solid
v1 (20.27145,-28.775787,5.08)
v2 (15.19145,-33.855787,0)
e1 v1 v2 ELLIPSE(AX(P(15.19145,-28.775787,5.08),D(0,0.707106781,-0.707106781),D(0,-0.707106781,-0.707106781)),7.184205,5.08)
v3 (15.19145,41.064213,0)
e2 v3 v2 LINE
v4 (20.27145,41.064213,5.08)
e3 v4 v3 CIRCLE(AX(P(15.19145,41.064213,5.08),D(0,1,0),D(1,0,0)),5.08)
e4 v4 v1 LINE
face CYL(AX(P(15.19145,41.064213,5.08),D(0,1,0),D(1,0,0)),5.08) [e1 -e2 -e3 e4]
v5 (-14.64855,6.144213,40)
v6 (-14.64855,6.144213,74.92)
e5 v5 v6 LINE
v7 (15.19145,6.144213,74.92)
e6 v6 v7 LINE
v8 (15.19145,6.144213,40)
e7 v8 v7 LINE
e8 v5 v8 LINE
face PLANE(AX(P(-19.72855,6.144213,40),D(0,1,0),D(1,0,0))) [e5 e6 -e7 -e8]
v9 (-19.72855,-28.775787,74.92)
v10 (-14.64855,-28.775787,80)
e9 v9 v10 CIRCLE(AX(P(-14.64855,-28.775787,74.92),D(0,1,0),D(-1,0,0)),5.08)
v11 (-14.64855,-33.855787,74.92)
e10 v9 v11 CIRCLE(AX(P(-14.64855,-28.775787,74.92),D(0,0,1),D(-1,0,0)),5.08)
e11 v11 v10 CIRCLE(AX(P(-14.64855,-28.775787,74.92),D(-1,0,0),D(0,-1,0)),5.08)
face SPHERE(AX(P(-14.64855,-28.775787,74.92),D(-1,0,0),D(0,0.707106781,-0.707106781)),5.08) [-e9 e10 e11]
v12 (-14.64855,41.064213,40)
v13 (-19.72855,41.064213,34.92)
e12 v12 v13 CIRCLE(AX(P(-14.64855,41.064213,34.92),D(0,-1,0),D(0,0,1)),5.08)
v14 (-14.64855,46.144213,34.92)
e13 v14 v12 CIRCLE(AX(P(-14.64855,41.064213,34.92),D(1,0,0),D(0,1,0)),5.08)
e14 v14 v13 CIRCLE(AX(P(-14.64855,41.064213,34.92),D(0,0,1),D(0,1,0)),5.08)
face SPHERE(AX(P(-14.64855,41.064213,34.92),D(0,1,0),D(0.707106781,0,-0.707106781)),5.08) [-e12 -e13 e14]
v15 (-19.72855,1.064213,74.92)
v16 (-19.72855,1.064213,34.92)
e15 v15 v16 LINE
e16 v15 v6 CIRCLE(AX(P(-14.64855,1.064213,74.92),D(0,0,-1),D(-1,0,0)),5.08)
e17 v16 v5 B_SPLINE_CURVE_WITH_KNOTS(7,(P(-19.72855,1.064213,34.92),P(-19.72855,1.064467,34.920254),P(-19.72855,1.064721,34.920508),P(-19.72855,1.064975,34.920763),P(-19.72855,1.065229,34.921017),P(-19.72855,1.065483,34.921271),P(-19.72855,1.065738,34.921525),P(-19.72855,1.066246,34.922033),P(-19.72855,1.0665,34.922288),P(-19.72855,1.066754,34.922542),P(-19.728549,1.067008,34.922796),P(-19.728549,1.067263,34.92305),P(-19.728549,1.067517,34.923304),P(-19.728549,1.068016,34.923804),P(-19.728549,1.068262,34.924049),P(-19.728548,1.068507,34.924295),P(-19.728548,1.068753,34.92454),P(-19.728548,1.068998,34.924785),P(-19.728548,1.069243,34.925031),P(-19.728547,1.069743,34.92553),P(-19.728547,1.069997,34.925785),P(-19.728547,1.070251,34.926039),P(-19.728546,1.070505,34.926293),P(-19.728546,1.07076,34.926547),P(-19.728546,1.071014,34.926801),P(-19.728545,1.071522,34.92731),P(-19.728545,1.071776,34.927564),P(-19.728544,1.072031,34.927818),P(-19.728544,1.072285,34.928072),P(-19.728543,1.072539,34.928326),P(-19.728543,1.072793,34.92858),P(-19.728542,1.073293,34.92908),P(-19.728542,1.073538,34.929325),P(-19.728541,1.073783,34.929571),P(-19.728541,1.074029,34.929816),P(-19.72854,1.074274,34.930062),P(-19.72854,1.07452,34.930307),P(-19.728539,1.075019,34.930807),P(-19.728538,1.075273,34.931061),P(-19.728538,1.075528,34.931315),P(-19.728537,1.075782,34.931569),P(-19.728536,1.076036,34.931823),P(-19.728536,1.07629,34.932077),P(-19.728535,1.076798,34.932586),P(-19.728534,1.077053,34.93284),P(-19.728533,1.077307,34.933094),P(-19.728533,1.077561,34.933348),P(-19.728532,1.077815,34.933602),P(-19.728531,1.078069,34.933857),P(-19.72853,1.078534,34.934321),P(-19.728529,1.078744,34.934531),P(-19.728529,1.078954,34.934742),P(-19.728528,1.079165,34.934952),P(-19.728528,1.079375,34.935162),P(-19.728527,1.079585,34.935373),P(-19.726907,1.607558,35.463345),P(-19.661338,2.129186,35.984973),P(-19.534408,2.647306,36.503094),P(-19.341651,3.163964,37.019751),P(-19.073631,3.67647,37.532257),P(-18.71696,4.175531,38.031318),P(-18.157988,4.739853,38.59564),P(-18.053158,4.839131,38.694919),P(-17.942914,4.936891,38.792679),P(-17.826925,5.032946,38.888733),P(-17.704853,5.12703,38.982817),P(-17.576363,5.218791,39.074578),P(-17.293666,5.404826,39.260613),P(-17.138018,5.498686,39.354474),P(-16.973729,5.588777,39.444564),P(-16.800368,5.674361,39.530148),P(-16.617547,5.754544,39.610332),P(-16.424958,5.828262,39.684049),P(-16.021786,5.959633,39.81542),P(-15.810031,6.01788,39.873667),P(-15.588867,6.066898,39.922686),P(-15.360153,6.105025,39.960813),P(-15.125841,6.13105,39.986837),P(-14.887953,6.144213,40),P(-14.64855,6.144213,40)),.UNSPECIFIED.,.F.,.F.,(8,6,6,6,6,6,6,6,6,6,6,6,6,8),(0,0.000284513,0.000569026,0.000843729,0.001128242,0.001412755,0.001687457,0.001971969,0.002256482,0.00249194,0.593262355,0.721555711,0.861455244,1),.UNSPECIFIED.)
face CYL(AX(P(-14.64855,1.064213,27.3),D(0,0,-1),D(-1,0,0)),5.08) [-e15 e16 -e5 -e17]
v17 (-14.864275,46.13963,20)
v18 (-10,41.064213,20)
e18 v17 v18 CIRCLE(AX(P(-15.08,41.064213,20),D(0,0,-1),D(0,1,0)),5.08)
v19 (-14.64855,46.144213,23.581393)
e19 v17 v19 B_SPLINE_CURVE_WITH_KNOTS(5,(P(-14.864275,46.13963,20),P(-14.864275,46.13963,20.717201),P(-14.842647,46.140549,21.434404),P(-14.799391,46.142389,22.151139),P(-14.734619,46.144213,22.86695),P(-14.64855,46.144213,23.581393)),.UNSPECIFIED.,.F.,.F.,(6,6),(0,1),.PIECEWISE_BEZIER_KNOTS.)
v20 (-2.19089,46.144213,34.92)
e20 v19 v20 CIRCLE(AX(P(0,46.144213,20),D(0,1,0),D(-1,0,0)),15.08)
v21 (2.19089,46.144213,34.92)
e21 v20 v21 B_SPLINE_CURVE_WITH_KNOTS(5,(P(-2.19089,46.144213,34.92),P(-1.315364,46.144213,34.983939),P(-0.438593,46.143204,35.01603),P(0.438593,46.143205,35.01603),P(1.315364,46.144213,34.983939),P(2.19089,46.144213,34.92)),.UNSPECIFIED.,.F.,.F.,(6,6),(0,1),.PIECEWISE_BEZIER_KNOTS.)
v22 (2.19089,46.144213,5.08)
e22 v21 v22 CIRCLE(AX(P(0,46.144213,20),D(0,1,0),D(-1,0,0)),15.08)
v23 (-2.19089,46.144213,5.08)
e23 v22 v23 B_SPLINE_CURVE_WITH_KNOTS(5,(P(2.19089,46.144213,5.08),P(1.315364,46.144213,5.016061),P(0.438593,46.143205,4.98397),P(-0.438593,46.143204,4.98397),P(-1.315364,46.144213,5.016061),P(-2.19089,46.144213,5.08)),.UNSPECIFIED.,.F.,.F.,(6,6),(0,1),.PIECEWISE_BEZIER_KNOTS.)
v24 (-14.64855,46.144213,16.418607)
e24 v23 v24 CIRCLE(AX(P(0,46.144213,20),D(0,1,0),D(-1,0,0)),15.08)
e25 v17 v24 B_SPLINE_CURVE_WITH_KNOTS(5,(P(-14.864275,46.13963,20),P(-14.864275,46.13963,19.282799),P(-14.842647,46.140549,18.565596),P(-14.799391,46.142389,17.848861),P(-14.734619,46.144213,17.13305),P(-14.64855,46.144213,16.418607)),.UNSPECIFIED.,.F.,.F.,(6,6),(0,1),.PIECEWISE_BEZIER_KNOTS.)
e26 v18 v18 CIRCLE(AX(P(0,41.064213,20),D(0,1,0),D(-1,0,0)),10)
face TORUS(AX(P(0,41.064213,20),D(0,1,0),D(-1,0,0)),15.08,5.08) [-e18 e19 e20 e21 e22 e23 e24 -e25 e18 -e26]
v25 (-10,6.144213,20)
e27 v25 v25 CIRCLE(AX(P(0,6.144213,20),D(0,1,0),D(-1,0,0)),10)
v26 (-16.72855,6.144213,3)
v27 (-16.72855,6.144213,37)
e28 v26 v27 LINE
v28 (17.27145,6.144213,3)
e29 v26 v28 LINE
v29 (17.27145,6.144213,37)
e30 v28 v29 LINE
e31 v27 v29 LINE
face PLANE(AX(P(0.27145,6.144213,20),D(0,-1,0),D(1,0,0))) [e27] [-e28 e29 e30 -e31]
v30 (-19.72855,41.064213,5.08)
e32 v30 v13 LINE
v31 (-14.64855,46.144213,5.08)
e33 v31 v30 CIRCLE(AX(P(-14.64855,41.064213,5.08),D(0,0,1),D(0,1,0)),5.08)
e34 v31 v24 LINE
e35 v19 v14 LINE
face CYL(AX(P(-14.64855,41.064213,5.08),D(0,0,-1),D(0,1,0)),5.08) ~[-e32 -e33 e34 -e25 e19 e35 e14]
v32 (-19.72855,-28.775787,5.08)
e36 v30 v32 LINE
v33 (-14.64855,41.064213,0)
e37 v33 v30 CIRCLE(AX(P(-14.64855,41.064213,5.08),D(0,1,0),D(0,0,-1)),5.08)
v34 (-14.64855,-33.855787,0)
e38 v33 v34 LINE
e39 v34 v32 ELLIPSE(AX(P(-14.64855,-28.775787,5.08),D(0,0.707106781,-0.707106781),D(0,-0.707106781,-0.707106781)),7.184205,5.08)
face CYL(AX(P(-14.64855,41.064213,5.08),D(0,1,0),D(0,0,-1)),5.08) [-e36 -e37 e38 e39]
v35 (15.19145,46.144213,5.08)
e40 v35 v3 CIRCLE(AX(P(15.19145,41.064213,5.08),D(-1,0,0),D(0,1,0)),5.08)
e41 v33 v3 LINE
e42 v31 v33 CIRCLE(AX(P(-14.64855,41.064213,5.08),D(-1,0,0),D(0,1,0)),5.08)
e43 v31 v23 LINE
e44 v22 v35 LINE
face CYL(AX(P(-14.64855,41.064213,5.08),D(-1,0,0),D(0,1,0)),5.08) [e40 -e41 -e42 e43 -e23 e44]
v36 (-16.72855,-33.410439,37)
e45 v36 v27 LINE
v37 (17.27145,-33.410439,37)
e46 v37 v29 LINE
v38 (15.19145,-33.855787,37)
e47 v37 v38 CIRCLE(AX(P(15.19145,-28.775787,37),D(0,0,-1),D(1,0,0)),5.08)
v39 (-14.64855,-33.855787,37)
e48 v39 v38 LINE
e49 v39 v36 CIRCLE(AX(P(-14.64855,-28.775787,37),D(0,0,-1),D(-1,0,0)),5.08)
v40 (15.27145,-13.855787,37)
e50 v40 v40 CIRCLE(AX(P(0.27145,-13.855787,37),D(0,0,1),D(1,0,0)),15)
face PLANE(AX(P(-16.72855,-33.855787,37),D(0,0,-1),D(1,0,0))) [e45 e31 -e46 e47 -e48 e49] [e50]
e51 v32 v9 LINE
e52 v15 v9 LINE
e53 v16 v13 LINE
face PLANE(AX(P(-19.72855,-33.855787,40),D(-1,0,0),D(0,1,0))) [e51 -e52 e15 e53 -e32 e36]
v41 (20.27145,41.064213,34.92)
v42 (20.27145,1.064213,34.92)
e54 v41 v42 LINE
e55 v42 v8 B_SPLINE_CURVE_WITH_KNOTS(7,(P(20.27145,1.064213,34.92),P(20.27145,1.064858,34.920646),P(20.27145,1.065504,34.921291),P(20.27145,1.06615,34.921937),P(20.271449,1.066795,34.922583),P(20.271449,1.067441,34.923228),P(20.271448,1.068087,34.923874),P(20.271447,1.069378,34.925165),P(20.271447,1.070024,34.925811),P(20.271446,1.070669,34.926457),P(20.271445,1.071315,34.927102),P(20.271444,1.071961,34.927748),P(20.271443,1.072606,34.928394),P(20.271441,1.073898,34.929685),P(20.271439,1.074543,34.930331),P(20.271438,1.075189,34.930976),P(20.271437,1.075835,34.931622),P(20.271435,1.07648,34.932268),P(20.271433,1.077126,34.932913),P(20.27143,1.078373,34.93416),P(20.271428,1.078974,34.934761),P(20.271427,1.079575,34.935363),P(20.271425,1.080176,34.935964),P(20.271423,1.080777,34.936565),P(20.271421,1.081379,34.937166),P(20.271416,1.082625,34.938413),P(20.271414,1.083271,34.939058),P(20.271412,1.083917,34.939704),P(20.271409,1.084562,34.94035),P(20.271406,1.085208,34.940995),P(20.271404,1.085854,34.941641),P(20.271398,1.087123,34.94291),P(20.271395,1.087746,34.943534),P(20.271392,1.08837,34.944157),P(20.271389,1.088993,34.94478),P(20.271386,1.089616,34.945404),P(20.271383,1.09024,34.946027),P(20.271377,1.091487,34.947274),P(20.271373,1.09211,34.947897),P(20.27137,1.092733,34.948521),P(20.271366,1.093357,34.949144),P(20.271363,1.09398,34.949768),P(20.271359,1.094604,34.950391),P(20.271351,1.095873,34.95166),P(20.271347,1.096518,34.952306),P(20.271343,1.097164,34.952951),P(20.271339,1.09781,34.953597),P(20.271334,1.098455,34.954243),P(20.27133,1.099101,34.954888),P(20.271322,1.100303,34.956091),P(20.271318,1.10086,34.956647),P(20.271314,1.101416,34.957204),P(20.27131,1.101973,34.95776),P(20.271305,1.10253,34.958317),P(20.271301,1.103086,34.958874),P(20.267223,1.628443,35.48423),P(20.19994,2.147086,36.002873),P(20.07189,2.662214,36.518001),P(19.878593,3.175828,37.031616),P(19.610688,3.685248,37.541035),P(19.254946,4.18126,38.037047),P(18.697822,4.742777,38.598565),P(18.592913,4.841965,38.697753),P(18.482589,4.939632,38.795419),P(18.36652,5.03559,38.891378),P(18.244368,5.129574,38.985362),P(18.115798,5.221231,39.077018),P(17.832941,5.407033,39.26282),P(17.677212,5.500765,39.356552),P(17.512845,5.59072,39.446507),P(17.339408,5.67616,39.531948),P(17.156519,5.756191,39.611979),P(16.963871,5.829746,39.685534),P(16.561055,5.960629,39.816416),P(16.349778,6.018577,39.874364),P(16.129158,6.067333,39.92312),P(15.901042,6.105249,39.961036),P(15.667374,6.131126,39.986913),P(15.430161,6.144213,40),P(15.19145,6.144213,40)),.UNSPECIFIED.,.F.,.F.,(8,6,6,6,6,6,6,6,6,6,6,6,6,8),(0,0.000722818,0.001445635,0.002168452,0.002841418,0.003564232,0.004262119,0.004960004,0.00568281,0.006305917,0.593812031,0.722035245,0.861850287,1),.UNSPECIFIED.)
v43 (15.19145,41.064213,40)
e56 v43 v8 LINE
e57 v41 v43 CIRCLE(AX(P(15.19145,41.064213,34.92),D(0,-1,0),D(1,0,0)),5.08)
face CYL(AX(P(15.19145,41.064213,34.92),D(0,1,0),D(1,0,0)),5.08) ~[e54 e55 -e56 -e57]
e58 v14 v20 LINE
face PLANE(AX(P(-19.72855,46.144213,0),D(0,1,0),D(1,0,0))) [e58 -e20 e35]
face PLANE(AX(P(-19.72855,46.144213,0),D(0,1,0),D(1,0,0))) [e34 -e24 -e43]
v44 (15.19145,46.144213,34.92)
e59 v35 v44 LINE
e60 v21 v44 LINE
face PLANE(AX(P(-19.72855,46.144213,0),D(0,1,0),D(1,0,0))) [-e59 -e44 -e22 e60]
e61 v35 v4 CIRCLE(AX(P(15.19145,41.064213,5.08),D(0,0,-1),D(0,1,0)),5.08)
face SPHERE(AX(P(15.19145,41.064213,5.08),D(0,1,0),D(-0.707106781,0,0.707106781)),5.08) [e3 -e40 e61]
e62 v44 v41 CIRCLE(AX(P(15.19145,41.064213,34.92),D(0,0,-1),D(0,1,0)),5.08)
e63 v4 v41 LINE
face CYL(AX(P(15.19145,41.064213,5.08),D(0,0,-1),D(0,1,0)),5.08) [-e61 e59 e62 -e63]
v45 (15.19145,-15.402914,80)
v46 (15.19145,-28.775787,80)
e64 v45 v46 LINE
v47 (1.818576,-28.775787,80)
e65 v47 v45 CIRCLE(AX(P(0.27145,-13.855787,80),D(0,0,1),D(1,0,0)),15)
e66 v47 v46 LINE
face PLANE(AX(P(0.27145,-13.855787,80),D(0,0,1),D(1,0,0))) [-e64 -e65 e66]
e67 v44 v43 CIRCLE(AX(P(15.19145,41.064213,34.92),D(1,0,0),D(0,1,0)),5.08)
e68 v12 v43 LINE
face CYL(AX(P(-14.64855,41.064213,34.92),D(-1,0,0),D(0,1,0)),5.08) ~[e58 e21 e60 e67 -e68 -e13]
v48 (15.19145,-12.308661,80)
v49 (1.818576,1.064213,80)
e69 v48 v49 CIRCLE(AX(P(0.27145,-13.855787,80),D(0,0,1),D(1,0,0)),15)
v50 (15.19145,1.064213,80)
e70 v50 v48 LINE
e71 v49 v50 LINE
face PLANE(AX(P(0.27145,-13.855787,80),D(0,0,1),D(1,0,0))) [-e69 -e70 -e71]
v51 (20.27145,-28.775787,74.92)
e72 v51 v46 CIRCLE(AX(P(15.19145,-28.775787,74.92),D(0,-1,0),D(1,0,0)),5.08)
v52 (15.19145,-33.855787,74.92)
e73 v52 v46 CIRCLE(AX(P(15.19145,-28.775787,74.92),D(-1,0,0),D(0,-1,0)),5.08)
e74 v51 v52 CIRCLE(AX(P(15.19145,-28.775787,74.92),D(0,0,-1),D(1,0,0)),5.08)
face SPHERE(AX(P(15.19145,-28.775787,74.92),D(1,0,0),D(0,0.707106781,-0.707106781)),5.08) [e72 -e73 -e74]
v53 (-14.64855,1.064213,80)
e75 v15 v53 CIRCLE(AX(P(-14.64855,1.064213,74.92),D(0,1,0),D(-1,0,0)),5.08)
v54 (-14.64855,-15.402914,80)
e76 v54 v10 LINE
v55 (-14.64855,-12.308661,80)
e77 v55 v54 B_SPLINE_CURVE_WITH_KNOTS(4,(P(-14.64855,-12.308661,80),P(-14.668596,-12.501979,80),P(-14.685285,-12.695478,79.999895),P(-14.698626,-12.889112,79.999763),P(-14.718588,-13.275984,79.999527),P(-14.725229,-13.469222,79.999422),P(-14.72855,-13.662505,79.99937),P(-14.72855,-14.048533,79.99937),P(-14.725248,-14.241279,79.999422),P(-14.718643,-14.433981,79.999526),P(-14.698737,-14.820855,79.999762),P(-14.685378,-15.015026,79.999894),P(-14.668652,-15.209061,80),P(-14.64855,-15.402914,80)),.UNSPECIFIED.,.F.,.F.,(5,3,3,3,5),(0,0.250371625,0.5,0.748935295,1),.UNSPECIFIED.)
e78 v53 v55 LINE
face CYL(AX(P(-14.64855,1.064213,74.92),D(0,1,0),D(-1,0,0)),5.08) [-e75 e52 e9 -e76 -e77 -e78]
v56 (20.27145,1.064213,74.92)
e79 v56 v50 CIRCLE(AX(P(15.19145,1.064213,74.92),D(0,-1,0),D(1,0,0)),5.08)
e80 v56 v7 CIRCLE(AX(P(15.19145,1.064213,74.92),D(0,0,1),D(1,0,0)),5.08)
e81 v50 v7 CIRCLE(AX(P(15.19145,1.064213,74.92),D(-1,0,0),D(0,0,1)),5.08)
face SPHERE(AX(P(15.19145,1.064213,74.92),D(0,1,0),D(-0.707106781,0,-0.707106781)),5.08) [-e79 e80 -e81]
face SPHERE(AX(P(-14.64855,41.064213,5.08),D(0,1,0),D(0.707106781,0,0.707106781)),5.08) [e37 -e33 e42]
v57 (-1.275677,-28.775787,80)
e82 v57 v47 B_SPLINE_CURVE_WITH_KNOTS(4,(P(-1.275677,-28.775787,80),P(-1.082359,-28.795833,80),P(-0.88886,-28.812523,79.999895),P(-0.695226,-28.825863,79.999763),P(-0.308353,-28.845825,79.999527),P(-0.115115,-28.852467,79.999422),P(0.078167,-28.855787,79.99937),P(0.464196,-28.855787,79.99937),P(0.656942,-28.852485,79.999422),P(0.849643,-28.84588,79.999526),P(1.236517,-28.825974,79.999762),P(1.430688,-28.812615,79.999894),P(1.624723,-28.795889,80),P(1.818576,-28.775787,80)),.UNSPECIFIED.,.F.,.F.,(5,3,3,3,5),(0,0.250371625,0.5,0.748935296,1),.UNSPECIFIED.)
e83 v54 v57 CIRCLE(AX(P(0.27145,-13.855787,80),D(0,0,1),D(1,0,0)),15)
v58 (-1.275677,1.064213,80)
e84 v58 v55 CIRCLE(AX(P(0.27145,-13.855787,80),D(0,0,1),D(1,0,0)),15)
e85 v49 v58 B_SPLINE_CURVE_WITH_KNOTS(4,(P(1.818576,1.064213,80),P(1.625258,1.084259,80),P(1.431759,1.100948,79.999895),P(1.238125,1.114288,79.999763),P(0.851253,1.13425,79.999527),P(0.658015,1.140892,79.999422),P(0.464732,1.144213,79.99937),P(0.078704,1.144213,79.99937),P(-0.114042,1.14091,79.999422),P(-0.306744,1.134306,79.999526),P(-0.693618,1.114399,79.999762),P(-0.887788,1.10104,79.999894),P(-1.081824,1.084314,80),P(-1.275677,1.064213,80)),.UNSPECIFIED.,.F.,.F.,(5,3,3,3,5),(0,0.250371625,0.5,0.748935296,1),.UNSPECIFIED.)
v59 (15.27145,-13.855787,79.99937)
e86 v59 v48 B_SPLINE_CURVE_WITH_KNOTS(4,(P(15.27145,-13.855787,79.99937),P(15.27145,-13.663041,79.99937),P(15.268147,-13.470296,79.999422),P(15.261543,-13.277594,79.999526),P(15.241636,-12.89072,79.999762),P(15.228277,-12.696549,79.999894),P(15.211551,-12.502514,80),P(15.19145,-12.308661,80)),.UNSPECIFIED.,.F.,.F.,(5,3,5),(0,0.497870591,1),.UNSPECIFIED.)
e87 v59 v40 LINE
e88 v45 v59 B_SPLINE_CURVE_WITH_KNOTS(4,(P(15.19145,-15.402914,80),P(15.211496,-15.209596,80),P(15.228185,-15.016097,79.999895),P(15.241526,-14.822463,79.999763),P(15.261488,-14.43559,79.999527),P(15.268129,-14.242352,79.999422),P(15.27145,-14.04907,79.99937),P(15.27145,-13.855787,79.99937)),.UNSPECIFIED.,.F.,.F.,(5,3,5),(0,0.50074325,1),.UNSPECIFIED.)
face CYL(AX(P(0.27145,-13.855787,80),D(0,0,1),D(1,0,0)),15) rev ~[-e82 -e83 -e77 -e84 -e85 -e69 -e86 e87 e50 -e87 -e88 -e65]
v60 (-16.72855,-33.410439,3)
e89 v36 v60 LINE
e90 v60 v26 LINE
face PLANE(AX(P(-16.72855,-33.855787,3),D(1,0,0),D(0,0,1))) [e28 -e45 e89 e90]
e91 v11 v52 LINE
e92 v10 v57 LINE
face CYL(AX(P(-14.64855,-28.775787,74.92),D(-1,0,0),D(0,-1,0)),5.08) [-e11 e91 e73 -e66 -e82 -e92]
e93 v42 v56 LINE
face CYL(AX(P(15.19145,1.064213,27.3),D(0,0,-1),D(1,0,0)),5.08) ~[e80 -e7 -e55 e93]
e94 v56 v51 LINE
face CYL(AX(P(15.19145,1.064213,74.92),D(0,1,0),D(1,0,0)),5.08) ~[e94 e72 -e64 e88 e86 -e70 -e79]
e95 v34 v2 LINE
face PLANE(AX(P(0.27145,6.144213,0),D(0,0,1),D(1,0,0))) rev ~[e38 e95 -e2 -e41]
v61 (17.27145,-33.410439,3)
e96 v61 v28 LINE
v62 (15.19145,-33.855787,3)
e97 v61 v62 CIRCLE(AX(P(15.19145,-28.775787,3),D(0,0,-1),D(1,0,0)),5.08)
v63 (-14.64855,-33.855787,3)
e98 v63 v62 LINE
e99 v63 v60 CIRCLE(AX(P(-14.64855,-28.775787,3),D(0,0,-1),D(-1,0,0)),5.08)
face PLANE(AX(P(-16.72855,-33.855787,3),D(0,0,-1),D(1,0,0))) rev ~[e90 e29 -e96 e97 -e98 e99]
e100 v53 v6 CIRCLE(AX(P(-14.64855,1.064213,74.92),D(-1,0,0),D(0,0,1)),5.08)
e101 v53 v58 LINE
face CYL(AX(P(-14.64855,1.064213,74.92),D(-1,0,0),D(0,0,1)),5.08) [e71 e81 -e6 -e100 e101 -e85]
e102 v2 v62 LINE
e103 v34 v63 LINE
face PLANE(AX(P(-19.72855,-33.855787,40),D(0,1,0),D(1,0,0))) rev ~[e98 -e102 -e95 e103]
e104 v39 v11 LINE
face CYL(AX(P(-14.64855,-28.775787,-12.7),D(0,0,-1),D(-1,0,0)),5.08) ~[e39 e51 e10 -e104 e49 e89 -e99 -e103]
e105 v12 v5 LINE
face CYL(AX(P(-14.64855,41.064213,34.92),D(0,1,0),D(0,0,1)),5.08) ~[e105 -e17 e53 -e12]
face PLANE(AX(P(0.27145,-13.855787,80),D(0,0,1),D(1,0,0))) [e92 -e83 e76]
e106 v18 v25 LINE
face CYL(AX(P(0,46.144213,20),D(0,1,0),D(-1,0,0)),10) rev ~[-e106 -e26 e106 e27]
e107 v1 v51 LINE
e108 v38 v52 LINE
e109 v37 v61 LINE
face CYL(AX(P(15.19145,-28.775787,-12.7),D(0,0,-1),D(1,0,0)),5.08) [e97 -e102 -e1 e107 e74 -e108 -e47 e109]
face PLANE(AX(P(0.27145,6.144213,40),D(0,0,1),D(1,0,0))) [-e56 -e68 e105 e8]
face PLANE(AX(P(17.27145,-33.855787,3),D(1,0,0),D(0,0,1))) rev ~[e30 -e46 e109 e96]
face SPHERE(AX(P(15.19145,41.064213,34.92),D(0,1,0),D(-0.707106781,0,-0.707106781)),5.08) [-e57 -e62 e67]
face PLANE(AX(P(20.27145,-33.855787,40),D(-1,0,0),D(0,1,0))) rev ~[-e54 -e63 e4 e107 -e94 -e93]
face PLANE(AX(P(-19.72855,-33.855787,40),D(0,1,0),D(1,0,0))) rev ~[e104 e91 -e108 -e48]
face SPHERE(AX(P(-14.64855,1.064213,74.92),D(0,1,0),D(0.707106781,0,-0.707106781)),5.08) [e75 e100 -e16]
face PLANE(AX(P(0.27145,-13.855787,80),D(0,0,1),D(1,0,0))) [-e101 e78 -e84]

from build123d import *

# Parameters (mm, degrees)
F0_W          = 40
F0_H          = 80
F1_DEPTH      = 40
F2_W          = 40
F2_H          = 40
F3_DEPTH      = 40
F4_W          = 34
F4_H          = 34
F5_DEPTH      = 40
F6_R          = 15
F7_DEPTH      = 43
F8_R          = 10
F9_DEPTH      = 80.001
F10_T1_DEPTH  = 87.62
F10_T3_DEPTH  = 29.84
F10_T5_DEPTH  = 34.92
F10_T7_DEPTH  = 34.92
F10_T9_DEPTH  = 29.84
F10_T11_DEPTH = 87.62
F10_T13_DEPTH = 29.84
F10_S17_W     = 5.08
F10_S17_H     = 5.08
F10_T18_DEPTH = 5.08
F10_S23_W     = 5.08
F10_S23_H     = 5.08
F10_T24_DEPTH = 5.08
F10_S29_W     = 5.08
F10_S29_H     = 5.08
F10_T30_DEPTH = 5.08
F10_S35_W     = 5.08
F10_S35_H     = 5.08
F10_T36_DEPTH = 5.08
F10_S41_W     = 5.08
F10_S41_H     = 5.08
F10_T42_DEPTH = 5.08
F10_S47_W     = 5.08
F10_S47_H     = 5.08
F10_T48_DEPTH = 5.08
F10_S53_W     = 5.08
F10_S53_H     = 5.08
F10_T54_DEPTH = 5.08
F10_S59_W     = 5.08
F10_S59_H     = 5.08
F10_T60_DEPTH = 5.08
F10_T69_DEPTH = 47.62
F10_T73_DEPTH = 47.62
F10_T80_DEPTH = 47.62
F10_T84_DEPTH = 47.62


# Not quite as in the source:
# - a fillet or chamfer that OpenCascade refuses, or shapes differently, is made with other operations: its cross-section is extruded or revolved along the edge and cut away or added


with BuildPart() as f1:
    # F0 (on Top) → F1 (new body)
    with BuildSketch(Plane.XY):
        with Locations((0.2714497969, 6.1442126253)):
            Rectangle(F0_W, F0_H)
    extrude(amount=F1_DEPTH)

    # F2 (on face) → F3 (join)
    with BuildSketch(Plane.XY.offset(40)):
        with Locations((0.2714497969, -13.8557873747)):
            Rectangle(F2_W, F2_H)
    extrude(amount=F3_DEPTH)

    # F4 (on face) → F5 (cut)
    with BuildSketch(Plane.XZ.offset(33.8557873747)):
        with Locations((0.2714497969, 20)):
            Rectangle(F4_W, F4_H)
    extrude(amount=-F5_DEPTH, mode=Mode.SUBTRACT)

    # F6 (on face) → F7 (cut, through all)
    with BuildSketch(Plane.XY.offset(80)):
        with Locations((0.2714497969, -13.8557873747)):
            Circle(F6_R)
    extrude(amount=-F7_DEPTH, mode=Mode.SUBTRACT)

    # F8 (on face) → F9 (cut, through all)
    with BuildSketch(Plane(origin=(0, 46.1442126253, 0), x_dir=(-1, 0, 0), z_dir=(0, 1, 0))):
        with Locations((0, 20)):
            Circle(F8_R)
    extrude(amount=-F9_DEPTH, mode=Mode.SUBTRACT)

    # F10: fillet of radius 5.08 on 17 edges, made by hand

    # F10_s2 → F10_t1 (cut)
    with BuildSketch(Plane.XY.offset(-12.7)):
        with BuildLine():
            ThreePointArc((20.2714497969, -28.7757873747), (18.7835522453, -32.3678898231), (15.1914497969, -33.8557873747))
            Line((15.1914497969, -33.8557873747), (20.2714497969, -33.8557873747))
            Line((20.2714497969, -33.8557873747), (20.2714497969, -28.7757873747))
        make_face()
        with BuildLine():
            ThreePointArc((-19.7285502031, -28.7757873747), (-18.2406526516, -32.3678898231), (-14.6485502031, -33.8557873747))
            Line((-14.6485502031, -33.8557873747), (-19.7285502031, -33.8557873747))
            Line((-19.7285502031, -33.8557873747), (-19.7285502031, -28.7757873747))
        make_face()
    extrude(amount=F10_T1_DEPTH, mode=Mode.SUBTRACT)

    # F10_s4 → F10_t3 (cut)
    with BuildSketch(Plane.XZ.offset(-1.0642126253)):
        with BuildLine():
            ThreePointArc((20.2714497969, 74.92), (18.7835522453, 78.5121024484), (15.1914497969, 80))
            Line((15.1914497969, 80), (20.2714497969, 80))
            Line((20.2714497969, 80), (20.2714497969, 74.92))
        make_face()
        with BuildLine():
            ThreePointArc((-19.7285502031, 74.92), (-18.2406526516, 78.5121024484), (-14.6485502031, 80))
            Line((-14.6485502031, 80), (-19.7285502031, 80))
            Line((-19.7285502031, 80), (-19.7285502031, 74.92))
        make_face()
    extrude(amount=F10_T3_DEPTH, mode=Mode.SUBTRACT)

    # F10_s6 → F10_t5 (cut)
    with BuildSketch(Plane.XY.offset(40)):
        with BuildLine():
            ThreePointArc((20.2714497969, 1.0642126253), (18.7835522453, 4.6563150738), (15.1914497969, 6.1442126253))
            Line((15.1914497969, 6.1442126253), (20.2714497969, 6.1442126253))
            Line((20.2714497969, 6.1442126253), (20.2714497969, 1.0642126253))
        make_face()
        with BuildLine():
            ThreePointArc((-19.7285502031, 1.0642126253), (-18.2406526516, 4.6563150738), (-14.6485502031, 6.1442126253))
            Line((-14.6485502031, 6.1442126253), (-19.7285502031, 6.1442126253))
            Line((-19.7285502031, 6.1442126253), (-19.7285502031, 1.0642126253))
        make_face()
    extrude(amount=F10_T5_DEPTH, mode=Mode.SUBTRACT)

    # F10_s8 → F10_t7 (cut)
    with BuildSketch(Plane.XZ.offset(-41.0642126253)):
        with BuildLine():
            ThreePointArc((20.2714497969, 34.92), (18.7835522453, 38.5121024484), (15.1914497969, 40))
            Line((15.1914497969, 40), (20.2714497969, 40))
            Line((20.2714497969, 40), (20.2714497969, 34.92))
        make_face()
        with BuildLine():
            ThreePointArc((-14.6485502031, 40), (-18.2406526516, 38.5121024484), (-19.7285502031, 34.92))
            Line((-19.7285502031, 34.92), (-19.7285502031, 40))
            Line((-19.7285502031, 40), (-14.6485502031, 40))
        make_face()
    extrude(amount=F10_T7_DEPTH, mode=Mode.SUBTRACT)

    # F10_s10 → F10_t9 (cut)
    with BuildSketch(Plane.XY.offset(5.08)):
        with BuildLine():
            ThreePointArc((15.1914497969, 46.1442126253), (18.7835522453, 44.6563150738), (20.2714497969, 41.0642126253))
            Line((20.2714497969, 41.0642126253), (20.2714497969, 46.1442126253))
            Line((20.2714497969, 46.1442126253), (15.1914497969, 46.1442126253))
        make_face()
        with BuildLine():
            ThreePointArc((-14.6485502031, 46.1442126253), (-18.2406526516, 44.6563150738), (-19.7285502031, 41.0642126253))
            Line((-19.7285502031, 41.0642126253), (-19.7285502031, 46.1442126253))
            Line((-19.7285502031, 46.1442126253), (-14.6485502031, 46.1442126253))
        make_face()
    extrude(amount=F10_T9_DEPTH, mode=Mode.SUBTRACT)

    # F10_s12 → F10_t11 (cut)
    with BuildSketch(Plane.XZ.offset(-41.0642126253)):
        with BuildLine():
            ThreePointArc((20.2714497969, 5.08), (18.7835522453, 1.4878975516), (15.1914497969, 0))
            Line((15.1914497969, 0), (20.2714497969, 0))
            Line((20.2714497969, 0), (20.2714497969, 5.08))
        make_face()
        with BuildLine():
            ThreePointArc((-14.6485502031, 0), (-18.2406526516, 1.4878975516), (-19.7285502031, 5.08))
            Line((-19.7285502031, 5.08), (-19.7285502031, 0))
            Line((-19.7285502031, 0), (-14.6485502031, 0))
        make_face()
    extrude(amount=F10_T11_DEPTH, mode=Mode.SUBTRACT)

    # F10_s14 → F10_t13 (cut)
    with BuildSketch(Plane.YZ.offset(-14.6485502031)):
        with BuildLine():
            ThreePointArc((46.1442126253, 5.08), (44.6563150738, 1.4878975516), (41.0642126253, 0))
            Line((41.0642126253, 0), (46.1442126253, 0))
            Line((46.1442126253, 0), (46.1442126253, 5.08))
        make_face()
        with BuildLine():
            ThreePointArc((46.1442126253, 34.92), (44.6563150738, 38.5121024484), (41.0642126253, 40))
            Line((41.0642126253, 40), (46.1442126253, 40))
            Line((46.1442126253, 40), (46.1442126253, 34.92))
        make_face()
        with BuildLine():
            ThreePointArc((-33.8557873747, 74.92), (-32.3678898231, 78.5121024484), (-28.7757873747, 80))
            Line((-28.7757873747, 80), (-33.8557873747, 80))
            Line((-33.8557873747, 80), (-33.8557873747, 74.92))
        make_face()
        with BuildLine():
            ThreePointArc((1.0642126253, 80), (4.6563150738, 78.5121024484), (6.1442126253, 74.92))
            Line((6.1442126253, 74.92), (6.1442126253, 80))
            Line((6.1442126253, 80), (1.0642126253, 80))
        make_face()
    extrude(amount=F10_T13_DEPTH, mode=Mode.SUBTRACT)


with BuildPart() as f10_tool16:
    # F10_s17 → F10_t18 (new body)
    with BuildSketch(Plane.YZ.offset(15.1914497969)):
        with Locations((-31.3157873747, 77.46)):
            Rectangle(F10_S17_W, F10_S17_H)
    extrude(amount=F10_T18_DEPTH)

    # F10_s19 → F10_t20 (revolve, cut)
    with BuildSketch(Plane(origin=(15.1914497969, -28.7757873747, 74.92), x_dir=(0, 0.7071067812, -0.7071067812), z_dir=(0, -0.7071067812, -0.7071067812))):
        with BuildLine():
            ThreePointArc((0, -5.08), (5.08, 0), (0, 5.08))
            Line((0, 5.08), (0, -5.08))
        make_face()
    revolve(axis=Axis((15.1914497969, -28.7757873747, 74.92), (1, 0, 0)), mode=Mode.SUBTRACT)


with BuildPart() as f1_1:
    add(f1.part)

    # F10_t15: cut F10_tool16
    add(f10_tool16.part, mode=Mode.SUBTRACT)


with BuildPart() as f10_tool22:
    # F10_s23 → F10_t24 (new body)
    with BuildSketch(Plane.XZ.offset(-1.0642126253)):
        with Locations((17.7314497969, 77.46)):
            Rectangle(F10_S23_W, F10_S23_H)
    extrude(amount=-F10_T24_DEPTH)

    # F10_s25 → F10_t26 (revolve, cut)
    with BuildSketch(Plane(origin=(15.1914497969, 1.0642126253, 74.92), x_dir=(-0.7071067812, 0, -0.7071067812), z_dir=(0.7071067812, 0, -0.7071067812))):
        with BuildLine():
            ThreePointArc((0, -5.08), (5.08, 0), (0, 5.08))
            Line((0, 5.08), (0, -5.08))
        make_face()
    revolve(axis=Axis((15.1914497969, 1.0642126253, 74.92), (0, 1, 0)), mode=Mode.SUBTRACT)


with BuildPart() as f1_2:
    add(f1_1.part)

    # F10_t21: cut F10_tool22
    add(f10_tool22.part, mode=Mode.SUBTRACT)


with BuildPart() as f10_tool28:
    # F10_s29 → F10_t30 (new body)
    with BuildSketch(Plane.XZ.offset(-41.0642126253)):
        with Locations((17.7314497969, 37.46)):
            Rectangle(F10_S29_W, F10_S29_H)
    extrude(amount=-F10_T30_DEPTH)

    # F10_s31 → F10_t32 (revolve, cut)
    with BuildSketch(Plane(origin=(15.1914497969, 41.0642126253, 34.92), x_dir=(-0.7071067812, 0, -0.7071067812), z_dir=(0.7071067812, 0, -0.7071067812))):
        with BuildLine():
            ThreePointArc((0, -5.08), (5.08, 0), (0, 5.08))
            Line((0, 5.08), (0, -5.08))
        make_face()
    revolve(axis=Axis((15.1914497969, 41.0642126253, 34.92), (0, 1, 0)), mode=Mode.SUBTRACT)


with BuildPart() as f1_3:
    add(f1_2.part)

    # F10_t27: cut F10_tool28
    add(f10_tool28.part, mode=Mode.SUBTRACT)


with BuildPart() as f10_tool34:
    # F10_s35 → F10_t36 (new body)
    with BuildSketch(Plane.XZ.offset(-41.0642126253)):
        with Locations((17.7314497969, 2.54)):
            Rectangle(F10_S35_W, F10_S35_H)
    extrude(amount=-F10_T36_DEPTH)

    # F10_s37 → F10_t38 (revolve, cut)
    with BuildSketch(Plane(origin=(15.1914497969, 41.0642126253, 5.08), x_dir=(-0.7071067812, 0, 0.7071067812), z_dir=(-0.7071067812, 0, -0.7071067812))):
        with BuildLine():
            ThreePointArc((0, -5.08), (5.08, 0), (0, 5.08))
            Line((0, 5.08), (0, -5.08))
        make_face()
    revolve(axis=Axis((15.1914497969, 41.0642126253, 5.08), (0, 1, 0)), mode=Mode.SUBTRACT)


with BuildPart() as f1_4:
    add(f1_3.part)

    # F10_t33: cut F10_tool34
    add(f10_tool34.part, mode=Mode.SUBTRACT)


with BuildPart() as f10_tool40:
    # F10_s41 → F10_t42 (new body)
    with BuildSketch(Plane.XZ.offset(-41.0642126253)):
        with Locations((-17.1885502031, 2.54)):
            Rectangle(F10_S41_W, F10_S41_H)
    extrude(amount=-F10_T42_DEPTH)

    # F10_s43 → F10_t44 (revolve, cut)
    with BuildSketch(Plane(origin=(-14.6485502031, 41.0642126253, 5.08), x_dir=(0.7071067812, 0, 0.7071067812), z_dir=(-0.7071067812, 0, 0.7071067812))):
        with BuildLine():
            ThreePointArc((0, -5.08), (5.08, 0), (0, 5.08))
            Line((0, 5.08), (0, -5.08))
        make_face()
    revolve(axis=Axis((-14.6485502031, 41.0642126253, 5.08), (0, 1, 0)), mode=Mode.SUBTRACT)


with BuildPart() as f1_5:
    add(f1_4.part)

    # F10_t39: cut F10_tool40
    add(f10_tool40.part, mode=Mode.SUBTRACT)


with BuildPart() as f10_tool46:
    # F10_s47 → F10_t48 (new body)
    with BuildSketch(Plane.XZ.offset(-41.0642126253)):
        with Locations((-17.1885502031, 37.46)):
            Rectangle(F10_S47_W, F10_S47_H)
    extrude(amount=-F10_T48_DEPTH)

    # F10_s49 → F10_t50 (revolve, cut)
    with BuildSketch(Plane(origin=(-14.6485502031, 41.0642126253, 34.92), x_dir=(0.7071067812, 0, -0.7071067812), z_dir=(0.7071067812, 0, 0.7071067812))):
        with BuildLine():
            ThreePointArc((0, -5.08), (5.08, 0), (0, 5.08))
            Line((0, 5.08), (0, -5.08))
        make_face()
    revolve(axis=Axis((-14.6485502031, 41.0642126253, 34.92), (0, 1, 0)), mode=Mode.SUBTRACT)


with BuildPart() as f1_6:
    add(f1_5.part)

    # F10_t45: cut F10_tool46
    add(f10_tool46.part, mode=Mode.SUBTRACT)


with BuildPart() as f10_tool52:
    # F10_s53 → F10_t54 (new body)
    with BuildSketch(Plane.XZ.offset(-1.0642126253)):
        with Locations((-17.1885502031, 77.46)):
            Rectangle(F10_S53_W, F10_S53_H)
    extrude(amount=-F10_T54_DEPTH)

    # F10_s55 → F10_t56 (revolve, cut)
    with BuildSketch(Plane(origin=(-14.6485502031, 1.0642126253, 74.92), x_dir=(0.7071067812, 0, -0.7071067812), z_dir=(0.7071067812, 0, 0.7071067812))):
        with BuildLine():
            ThreePointArc((0, -5.08), (5.08, 0), (0, 5.08))
            Line((0, 5.08), (0, -5.08))
        make_face()
    revolve(axis=Axis((-14.6485502031, 1.0642126253, 74.92), (0, 1, 0)), mode=Mode.SUBTRACT)


with BuildPart() as f1_7:
    add(f1_6.part)

    # F10_t51: cut F10_tool52
    add(f10_tool52.part, mode=Mode.SUBTRACT)


with BuildPart() as f10_tool58:
    # F10_s59 → F10_t60 (new body)
    with BuildSketch(Plane.YZ.offset(-14.6485502031)):
        with Locations((-31.3157873747, 77.46)):
            Rectangle(F10_S59_W, F10_S59_H)
    extrude(amount=-F10_T60_DEPTH)

    # F10_s61 → F10_t62 (revolve, cut)
    with BuildSketch(Plane(origin=(-14.6485502031, -28.7757873747, 74.92), x_dir=(0, 0.7071067812, -0.7071067812), z_dir=(0, 0.7071067812, 0.7071067812))):
        with BuildLine():
            ThreePointArc((0, -5.08), (5.08, 0), (0, 5.08))
            Line((0, 5.08), (0, -5.08))
        make_face()
    revolve(axis=Axis((-14.6485502031, -28.7757873747, 74.92), (-1, 0, 0)), mode=Mode.SUBTRACT)


with BuildPart() as f1_8:
    add(f1_7.part)

    # F10_t57: cut F10_tool58
    add(f10_tool58.part, mode=Mode.SUBTRACT)

    # F10_s63 → F10_t64 (revolve, cut)
    with BuildSketch(Plane.XY.offset(20)):
        with BuildLine():
            ThreePointArc((-15.08, 46.1442126253), (-11.4878975516, 44.6563150738), (-10, 41.0642126253))
            Line((-10, 41.0642126253), (-10, 46.1442126253))
            Line((-10, 46.1442126253), (-15.08, 46.1442126253))
        make_face()
    revolve(axis=Axis((0, 46.1442126253, 20), (0, 1, 0)), mode=Mode.SUBTRACT)


with BuildPart() as f10_tool67:
    # F10_s68 → F10_t69 (new body)
    with BuildSketch(Plane.XY.offset(27.3)):
        with BuildLine():
            ThreePointArc((20.2714497969, 1.0642126253), (18.7835522453, 4.6563150738), (15.1914497969, 6.1442126253))
            Line((15.1914497969, 6.1442126253), (20.2714497969, 6.1442126253))
            Line((20.2714497969, 6.1442126253), (20.2714497969, 1.0642126253))
        make_face()
    extrude(amount=F10_T69_DEPTH)

    split(bisect_by=Plane.XY.offset(40), keep=Keep.BOTTOM)


with BuildPart() as f10_tool71:
    # F10_s72 → F10_t73 (new body)
    with BuildSketch(Plane.XZ.offset(6.5557873747)):
        with BuildLine():
            ThreePointArc((20.2714497969, 34.92), (18.7835522453, 38.5121024484), (15.1914497969, 40))
            Line((15.1914497969, 40), (20.2714497969, 40))
            Line((20.2714497969, 40), (20.2714497969, 34.92))
        make_face()
    extrude(amount=-F10_T73_DEPTH)

    split(bisect_by=Plane.XZ.offset(-6.1442126253), keep=Keep.TOP)


with BuildPart() as f10_tool67_1:
    add(f10_tool67.part)

    # F10_t75: intersect F10_tool71
    add(f10_tool71.part, mode=Mode.INTERSECT)


with BuildPart() as f1_9:
    add(f1_8.part)

    # F10_t65: cut F10_tool67
    add(f10_tool67_1.part, mode=Mode.SUBTRACT)


with BuildPart() as f10_tool78:
    # F10_s79 → F10_t80 (new body)
    with BuildSketch(Plane.XZ.offset(-41.0642126253)):
        with BuildLine():
            ThreePointArc((-14.6485502031, 40), (-18.2406526516, 38.5121024484), (-19.7285502031, 34.92))
            Line((-19.7285502031, 34.92), (-19.7285502031, 40))
            Line((-19.7285502031, 40), (-14.6485502031, 40))
        make_face()
    extrude(amount=F10_T80_DEPTH)

    split(bisect_by=Plane.XZ.offset(-6.1442126253), keep=Keep.TOP)


with BuildPart() as f10_tool82:
    # F10_s83 → F10_t84 (new body)
    with BuildSketch(Plane.XY.offset(27.3)):
        with BuildLine():
            ThreePointArc((-19.7285502031, 1.0642126253), (-18.2406526516, 4.6563150738), (-14.6485502031, 6.1442126253))
            Line((-14.6485502031, 6.1442126253), (-19.7285502031, 6.1442126253))
            Line((-19.7285502031, 6.1442126253), (-19.7285502031, 1.0642126253))
        make_face()
    extrude(amount=F10_T84_DEPTH)

    split(bisect_by=Plane.XY.offset(40), keep=Keep.BOTTOM)


with BuildPart() as f10_tool78_1:
    add(f10_tool78.part)

    # F10_t86: intersect F10_tool82
    add(f10_tool82.part, mode=Mode.INTERSECT)


with BuildPart() as f1_10:
    add(f1_9.part)

    # F10_t76: cut F10_tool78
    add(f10_tool78_1.part, mode=Mode.SUBTRACT)


solid = f1_10.part
